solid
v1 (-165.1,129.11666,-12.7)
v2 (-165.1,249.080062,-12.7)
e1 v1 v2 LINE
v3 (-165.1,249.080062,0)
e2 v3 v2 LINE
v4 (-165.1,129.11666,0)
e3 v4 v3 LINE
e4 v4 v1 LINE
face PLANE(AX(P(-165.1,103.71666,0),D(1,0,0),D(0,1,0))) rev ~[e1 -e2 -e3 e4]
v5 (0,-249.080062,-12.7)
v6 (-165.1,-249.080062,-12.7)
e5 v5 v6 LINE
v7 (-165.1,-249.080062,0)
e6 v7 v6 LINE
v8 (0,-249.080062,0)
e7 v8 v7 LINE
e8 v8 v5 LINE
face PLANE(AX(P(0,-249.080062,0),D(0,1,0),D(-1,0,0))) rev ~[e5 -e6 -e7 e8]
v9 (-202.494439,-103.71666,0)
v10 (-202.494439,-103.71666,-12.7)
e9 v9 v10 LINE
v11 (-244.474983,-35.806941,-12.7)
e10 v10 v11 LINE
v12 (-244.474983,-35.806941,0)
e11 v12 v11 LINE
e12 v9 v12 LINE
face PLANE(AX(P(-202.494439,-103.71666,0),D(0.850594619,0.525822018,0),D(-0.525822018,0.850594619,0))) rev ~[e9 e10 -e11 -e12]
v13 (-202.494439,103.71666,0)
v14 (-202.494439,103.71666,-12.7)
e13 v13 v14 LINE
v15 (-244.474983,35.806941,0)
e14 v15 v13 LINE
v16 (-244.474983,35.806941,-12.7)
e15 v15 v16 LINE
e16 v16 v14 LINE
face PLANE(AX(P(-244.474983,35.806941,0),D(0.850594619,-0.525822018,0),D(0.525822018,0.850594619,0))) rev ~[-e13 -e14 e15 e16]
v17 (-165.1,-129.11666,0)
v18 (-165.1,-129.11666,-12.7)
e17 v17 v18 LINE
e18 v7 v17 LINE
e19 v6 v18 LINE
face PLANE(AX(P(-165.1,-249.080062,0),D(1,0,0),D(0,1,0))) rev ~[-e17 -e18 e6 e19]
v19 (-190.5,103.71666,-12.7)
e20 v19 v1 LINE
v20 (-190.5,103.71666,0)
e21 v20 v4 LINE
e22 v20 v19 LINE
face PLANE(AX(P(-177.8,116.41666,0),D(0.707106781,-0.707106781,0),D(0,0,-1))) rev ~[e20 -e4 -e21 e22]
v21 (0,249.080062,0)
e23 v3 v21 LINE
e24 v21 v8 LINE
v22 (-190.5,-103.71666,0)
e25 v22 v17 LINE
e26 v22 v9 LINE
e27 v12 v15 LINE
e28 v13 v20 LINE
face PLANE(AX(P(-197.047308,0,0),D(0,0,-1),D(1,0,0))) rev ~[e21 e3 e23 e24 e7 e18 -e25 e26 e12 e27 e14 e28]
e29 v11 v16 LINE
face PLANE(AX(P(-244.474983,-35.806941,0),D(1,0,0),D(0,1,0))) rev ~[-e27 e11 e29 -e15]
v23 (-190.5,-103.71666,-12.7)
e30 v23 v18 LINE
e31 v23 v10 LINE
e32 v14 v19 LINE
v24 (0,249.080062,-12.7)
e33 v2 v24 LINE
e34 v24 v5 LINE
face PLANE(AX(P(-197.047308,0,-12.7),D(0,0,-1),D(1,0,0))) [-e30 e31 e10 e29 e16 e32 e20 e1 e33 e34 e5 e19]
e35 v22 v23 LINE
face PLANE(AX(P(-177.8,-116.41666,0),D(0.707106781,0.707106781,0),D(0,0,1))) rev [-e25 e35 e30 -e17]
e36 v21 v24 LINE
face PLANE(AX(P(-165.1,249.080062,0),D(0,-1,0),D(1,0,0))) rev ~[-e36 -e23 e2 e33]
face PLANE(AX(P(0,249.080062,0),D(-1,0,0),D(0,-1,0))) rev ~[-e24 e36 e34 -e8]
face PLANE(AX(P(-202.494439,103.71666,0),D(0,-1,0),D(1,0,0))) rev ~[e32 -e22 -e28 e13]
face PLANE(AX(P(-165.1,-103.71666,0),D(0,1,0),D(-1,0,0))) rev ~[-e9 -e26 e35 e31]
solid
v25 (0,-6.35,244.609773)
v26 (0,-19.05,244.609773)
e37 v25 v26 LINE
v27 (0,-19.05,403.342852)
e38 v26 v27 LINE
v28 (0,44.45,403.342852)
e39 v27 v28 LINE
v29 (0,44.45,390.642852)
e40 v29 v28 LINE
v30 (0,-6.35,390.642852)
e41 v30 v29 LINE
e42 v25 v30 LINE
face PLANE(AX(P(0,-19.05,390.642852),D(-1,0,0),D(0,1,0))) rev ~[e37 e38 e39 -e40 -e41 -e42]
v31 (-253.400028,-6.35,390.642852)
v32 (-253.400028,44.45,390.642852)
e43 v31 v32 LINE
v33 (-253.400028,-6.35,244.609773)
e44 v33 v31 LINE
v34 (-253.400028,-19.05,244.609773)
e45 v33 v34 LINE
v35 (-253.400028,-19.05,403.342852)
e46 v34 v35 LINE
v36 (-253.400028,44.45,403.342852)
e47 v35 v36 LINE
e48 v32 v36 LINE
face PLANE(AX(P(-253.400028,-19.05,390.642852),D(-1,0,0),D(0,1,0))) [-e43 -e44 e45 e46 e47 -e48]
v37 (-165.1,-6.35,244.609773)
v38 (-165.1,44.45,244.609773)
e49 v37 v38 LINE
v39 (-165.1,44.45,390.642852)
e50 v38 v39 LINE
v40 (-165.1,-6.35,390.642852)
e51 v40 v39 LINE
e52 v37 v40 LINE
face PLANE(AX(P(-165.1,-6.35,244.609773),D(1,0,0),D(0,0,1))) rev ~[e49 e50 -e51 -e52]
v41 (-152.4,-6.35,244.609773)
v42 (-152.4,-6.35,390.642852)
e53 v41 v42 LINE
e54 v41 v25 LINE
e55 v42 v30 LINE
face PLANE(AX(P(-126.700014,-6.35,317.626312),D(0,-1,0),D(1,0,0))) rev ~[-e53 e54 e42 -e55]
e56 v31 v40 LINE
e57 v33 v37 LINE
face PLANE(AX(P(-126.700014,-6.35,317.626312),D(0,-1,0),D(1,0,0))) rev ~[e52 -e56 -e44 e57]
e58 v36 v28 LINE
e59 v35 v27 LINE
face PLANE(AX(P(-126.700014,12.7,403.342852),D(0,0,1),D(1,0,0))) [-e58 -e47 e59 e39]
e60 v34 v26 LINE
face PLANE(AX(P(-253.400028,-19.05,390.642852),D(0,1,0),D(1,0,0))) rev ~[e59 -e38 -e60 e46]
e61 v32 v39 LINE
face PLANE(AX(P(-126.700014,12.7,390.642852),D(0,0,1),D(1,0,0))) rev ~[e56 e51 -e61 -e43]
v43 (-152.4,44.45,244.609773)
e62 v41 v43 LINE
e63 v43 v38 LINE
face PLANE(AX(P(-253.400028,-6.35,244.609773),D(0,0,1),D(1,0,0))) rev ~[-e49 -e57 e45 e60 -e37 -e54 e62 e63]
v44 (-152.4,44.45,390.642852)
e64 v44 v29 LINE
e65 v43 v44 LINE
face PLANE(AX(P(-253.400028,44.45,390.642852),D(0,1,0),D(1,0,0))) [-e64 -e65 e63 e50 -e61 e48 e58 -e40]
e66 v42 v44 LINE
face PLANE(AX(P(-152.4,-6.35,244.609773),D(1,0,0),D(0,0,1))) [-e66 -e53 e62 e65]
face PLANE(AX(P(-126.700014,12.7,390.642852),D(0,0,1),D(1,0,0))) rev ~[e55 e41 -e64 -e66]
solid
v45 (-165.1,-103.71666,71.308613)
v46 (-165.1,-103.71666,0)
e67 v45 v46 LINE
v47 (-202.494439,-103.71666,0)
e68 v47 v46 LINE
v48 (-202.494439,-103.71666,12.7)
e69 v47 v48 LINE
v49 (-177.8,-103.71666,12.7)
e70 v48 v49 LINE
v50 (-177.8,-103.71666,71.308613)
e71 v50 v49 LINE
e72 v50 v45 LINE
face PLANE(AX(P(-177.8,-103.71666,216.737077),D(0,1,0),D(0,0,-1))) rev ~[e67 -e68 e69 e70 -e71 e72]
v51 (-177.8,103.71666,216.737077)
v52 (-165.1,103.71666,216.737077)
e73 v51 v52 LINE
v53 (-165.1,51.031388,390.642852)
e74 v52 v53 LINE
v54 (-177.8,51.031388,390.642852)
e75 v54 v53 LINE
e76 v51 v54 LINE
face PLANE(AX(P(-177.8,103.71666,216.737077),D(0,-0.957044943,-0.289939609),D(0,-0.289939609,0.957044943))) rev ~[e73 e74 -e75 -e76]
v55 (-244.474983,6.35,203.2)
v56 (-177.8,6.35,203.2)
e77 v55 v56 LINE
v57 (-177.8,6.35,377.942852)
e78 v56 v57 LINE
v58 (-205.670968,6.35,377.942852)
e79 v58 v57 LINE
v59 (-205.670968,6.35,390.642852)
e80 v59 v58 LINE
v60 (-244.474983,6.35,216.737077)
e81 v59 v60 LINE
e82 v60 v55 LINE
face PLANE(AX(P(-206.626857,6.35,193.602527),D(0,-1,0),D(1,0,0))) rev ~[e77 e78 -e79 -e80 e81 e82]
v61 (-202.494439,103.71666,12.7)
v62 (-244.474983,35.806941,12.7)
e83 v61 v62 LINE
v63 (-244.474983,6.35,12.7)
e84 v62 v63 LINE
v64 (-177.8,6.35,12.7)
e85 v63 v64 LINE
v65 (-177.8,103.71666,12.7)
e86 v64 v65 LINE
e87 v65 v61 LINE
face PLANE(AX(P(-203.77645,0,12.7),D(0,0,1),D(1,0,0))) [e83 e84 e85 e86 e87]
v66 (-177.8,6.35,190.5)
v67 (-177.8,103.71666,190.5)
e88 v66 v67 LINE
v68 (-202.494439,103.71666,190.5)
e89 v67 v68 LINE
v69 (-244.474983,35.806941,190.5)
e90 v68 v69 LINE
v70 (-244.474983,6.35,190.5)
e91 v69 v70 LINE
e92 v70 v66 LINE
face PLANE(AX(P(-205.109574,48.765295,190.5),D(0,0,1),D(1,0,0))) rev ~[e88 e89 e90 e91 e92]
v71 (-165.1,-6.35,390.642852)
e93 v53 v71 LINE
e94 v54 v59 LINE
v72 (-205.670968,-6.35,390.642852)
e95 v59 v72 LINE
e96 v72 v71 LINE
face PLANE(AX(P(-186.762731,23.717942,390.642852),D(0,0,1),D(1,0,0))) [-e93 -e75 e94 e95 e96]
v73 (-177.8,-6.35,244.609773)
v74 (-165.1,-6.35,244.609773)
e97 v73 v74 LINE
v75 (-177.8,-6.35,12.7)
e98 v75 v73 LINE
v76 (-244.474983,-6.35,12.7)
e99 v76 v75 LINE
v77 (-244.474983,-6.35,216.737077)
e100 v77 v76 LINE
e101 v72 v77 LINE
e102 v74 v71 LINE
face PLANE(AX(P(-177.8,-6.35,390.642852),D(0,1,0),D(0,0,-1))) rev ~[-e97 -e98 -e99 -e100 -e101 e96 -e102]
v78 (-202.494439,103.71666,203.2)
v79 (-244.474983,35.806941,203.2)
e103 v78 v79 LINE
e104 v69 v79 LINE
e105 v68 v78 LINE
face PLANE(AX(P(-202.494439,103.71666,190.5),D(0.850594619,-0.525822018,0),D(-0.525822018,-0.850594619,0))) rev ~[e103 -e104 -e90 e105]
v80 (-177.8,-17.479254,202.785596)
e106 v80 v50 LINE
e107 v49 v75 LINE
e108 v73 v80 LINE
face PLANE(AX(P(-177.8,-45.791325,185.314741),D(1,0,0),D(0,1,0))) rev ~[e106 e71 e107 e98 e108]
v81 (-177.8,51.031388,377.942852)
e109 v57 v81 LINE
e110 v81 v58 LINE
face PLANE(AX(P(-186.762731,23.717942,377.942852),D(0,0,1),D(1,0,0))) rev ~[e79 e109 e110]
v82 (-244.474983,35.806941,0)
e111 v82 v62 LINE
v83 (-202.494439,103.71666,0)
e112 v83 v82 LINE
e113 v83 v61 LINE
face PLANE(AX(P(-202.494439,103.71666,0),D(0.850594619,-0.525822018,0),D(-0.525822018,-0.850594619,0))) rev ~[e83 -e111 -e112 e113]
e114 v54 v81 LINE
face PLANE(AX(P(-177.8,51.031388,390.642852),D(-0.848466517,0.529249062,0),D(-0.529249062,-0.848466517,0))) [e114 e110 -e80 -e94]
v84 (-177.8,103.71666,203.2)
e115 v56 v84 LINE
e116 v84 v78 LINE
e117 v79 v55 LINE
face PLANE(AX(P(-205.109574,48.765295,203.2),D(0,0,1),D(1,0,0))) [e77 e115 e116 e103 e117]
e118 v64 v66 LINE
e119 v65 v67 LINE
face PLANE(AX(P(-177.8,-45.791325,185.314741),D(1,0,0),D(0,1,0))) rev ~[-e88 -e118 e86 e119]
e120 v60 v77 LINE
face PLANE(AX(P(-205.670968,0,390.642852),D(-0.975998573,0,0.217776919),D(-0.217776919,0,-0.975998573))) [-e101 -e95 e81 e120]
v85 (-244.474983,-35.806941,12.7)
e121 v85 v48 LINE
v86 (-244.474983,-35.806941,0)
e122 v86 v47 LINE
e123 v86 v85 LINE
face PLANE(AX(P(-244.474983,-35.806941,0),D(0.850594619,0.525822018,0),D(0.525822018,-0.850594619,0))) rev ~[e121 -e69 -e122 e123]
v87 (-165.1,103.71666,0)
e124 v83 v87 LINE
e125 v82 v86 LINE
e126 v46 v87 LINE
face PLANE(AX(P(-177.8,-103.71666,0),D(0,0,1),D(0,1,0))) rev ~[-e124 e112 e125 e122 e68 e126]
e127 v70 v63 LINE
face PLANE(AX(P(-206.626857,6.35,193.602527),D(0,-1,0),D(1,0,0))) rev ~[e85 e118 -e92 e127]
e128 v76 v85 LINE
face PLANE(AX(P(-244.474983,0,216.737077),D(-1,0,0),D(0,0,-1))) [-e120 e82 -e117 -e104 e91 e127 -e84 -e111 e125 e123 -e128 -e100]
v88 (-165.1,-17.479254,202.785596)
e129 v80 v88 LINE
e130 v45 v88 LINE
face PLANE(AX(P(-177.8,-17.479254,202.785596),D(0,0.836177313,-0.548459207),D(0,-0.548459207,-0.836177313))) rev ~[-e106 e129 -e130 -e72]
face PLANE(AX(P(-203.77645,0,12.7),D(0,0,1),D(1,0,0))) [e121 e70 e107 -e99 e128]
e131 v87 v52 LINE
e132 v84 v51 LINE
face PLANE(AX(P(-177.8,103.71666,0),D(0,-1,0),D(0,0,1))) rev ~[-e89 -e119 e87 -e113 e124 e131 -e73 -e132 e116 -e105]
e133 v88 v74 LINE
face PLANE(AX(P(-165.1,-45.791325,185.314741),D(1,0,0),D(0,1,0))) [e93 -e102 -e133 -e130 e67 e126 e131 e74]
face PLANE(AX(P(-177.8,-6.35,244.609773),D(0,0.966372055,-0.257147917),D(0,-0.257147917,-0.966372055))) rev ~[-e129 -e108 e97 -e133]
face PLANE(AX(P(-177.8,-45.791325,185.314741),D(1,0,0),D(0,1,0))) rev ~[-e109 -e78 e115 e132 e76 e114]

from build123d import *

# Parameters (mm, degrees)
F1_DEPTH      = 12.7
F3_DEPTH      = 12.7
F5_DEPTH      = 6.35
F5_DEPTH_BACK = 6.35
F7_DEPTH      = 25.4
F8_START      = 177.8
F8_DEPTH      = 12.7
F10_DEPTH     = 12.7
F12_DEPTH     = 12.7
F13_SIZE      = 25.4
F14_W         = 253.4000277519
F14_H         = 146.0330784321
F15_DEPTH     = 12.7
F16_W         = 12.7
F16_H         = 146.0330784321
F17_DEPTH     = 50.8
F18_W         = 253.4000277519
F18_H         = 63.5
F19_DEPTH     = 12.7


with BuildPart() as f1:
    # F0 (on Top) → F1 (new body)
    with BuildSketch(Plane.XY):
        Polygon((-244.4749832617, 35.8069409784), (-244.4749832617, 0), (-244.4749832617, -35.8069409784), (-202.4944386959, -103.7166595656), (-177.8, -103.7166595656), (-177.8, 0), (-177.8, 103.7166595656), (-202.4944386959, 103.7166595656), align=None)
    extrude(amount=F1_DEPTH)

    # F2 (on face) → F3 (join)
    with BuildSketch(Plane.YZ.offset(-177.8)):
        Polygon((-103.7166595656, 216.7370766401), (-103.7166595656, 0), (0, 0), (0, 390.6428515911), (-51.0313883424, 390.6428515911), align=None)
        Polygon((0, 390.6428515911), (0, 0), (103.7166595656, 0), (103.7166595656, 216.7370766401), (51.0313883424, 390.6428515911), align=None)
    extrude(amount=F3_DEPTH)

    # F4 (on Front) → F5 (join, two sides)
    with BuildSketch(Plane.XZ) as f5_sk:
        Polygon((-202.4944386959, 12.7), (-177.8, 12.7), (-177.8, 216.7370766401), (-177.8, 390.6428515911), (-205.6709676981, 390.6428515911), (-244.4749832617, 216.7370766401), (-244.4749832617, 12.7), align=None)
    extrude(amount=F5_DEPTH)
    extrude(f5_sk.sketch, amount=-F5_DEPTH_BACK)

    # F6 (on face) → F7 (cut)
    with BuildSketch(Plane(origin=(-177.8, 0, 0), x_dir=(0, -1, 0), z_dir=(-1, 0, 0))):
        Polygon((51.0313883424, 390.6428515911), (6.35, 390.6428515911), (6.35, 244.609773159), (17.4792539328, 202.7855962515), (84.4946950674, 216.7370766401), (103.7166595656, 216.7370766401), align=None)
        Polygon((84.4946950674, 216.7370766401), (17.4792539328, 202.7855962515), (103.7166595656, 71.3086128235), (103.7166595656, 216.7370766401), align=None)
    extrude(amount=-F7_DEPTH, mode=Mode.SUBTRACT)

    # F5_face1 (on face) → F8 (join)
    with BuildSketch(Plane(origin=(-205.6951011652, 47.7051250828, 12.7), x_dir=(1, 0, 0), z_dir=(0, 0, 1)).offset(F8_START)):
        Polygon((-38.7798820965, -11.8981841043), (-38.7798820965, -41.3551250828), (27.8951011652, -41.3551250828), (27.8951011652, 56.0115344828), (3.2006624693, 56.0115344828), align=None)
    extrude(amount=F8_DEPTH)

    # F9 (on face) → F10 (join)
    with BuildSketch(Plane.XY.offset(390.6428515911)):
        Polygon((-177.8, 6.35), (-177.8, 51.0313883424), (-205.6709676981, 6.35), align=None)
    extrude(amount=-F10_DEPTH)


with BuildPart() as f12:
    # F11 (on face) → F12 (new body)
    with BuildSketch(Plane(origin=(0, 0, 0), x_dir=(1, 0, 0), z_dir=(0, 0, -1))):
        Polygon((-165.1, -103.7166595656), (-165.1, 103.7166595656), (-202.4944386959, 103.7166595656), (-244.4749832617, 35.8069409784), (-244.4749832617, -35.8069409784), (-202.4944386959, -103.7166595656), align=None)
        Polygon((-165.1, 249.0800619125), (-165.1, 103.7166595656), (-165.1, -103.7166595656), (-165.1, -249.0800619125), (0, -249.0800619125), (0, 249.0800619125), align=None)
    extrude(amount=F12_DEPTH)

    # F13
    f13_edges = [f12.edges().sort_by_distance(p)[0] for p in [
        (-165.1, -103.71666, -6.35),
        (-165.1, 103.71666, -6.35),
    ]]
    chamfer(f13_edges, length=F13_SIZE)


with BuildPart() as f15:
    # F14 (on face) → F15 (new body)
    with BuildSketch(Plane.XZ.offset(6.35)):
        with Locations((-126.700013876, 317.6263123751)):
            Rectangle(F14_W, F14_H)
    extrude(amount=F15_DEPTH)

    # F16 (on face) → F17 (join)
    with BuildSketch(Plane(origin=(0, -6.35, 0), x_dir=(-1, 0, 0), z_dir=(0, 1, 0))):
        with Locations((158.75, 317.6263123751)):
            Rectangle(F16_W, F16_H)
    extrude(amount=F17_DEPTH)

    # F18 (on face) → F19 (join)
    with BuildSketch(Plane.XY.offset(390.6428515911)):
        with Locations((-126.700013876, 12.7)):
            Rectangle(F18_W, F18_H)
    extrude(amount=F19_DEPTH)


solid = Compound([f1.part, f12.part, f15.part])
